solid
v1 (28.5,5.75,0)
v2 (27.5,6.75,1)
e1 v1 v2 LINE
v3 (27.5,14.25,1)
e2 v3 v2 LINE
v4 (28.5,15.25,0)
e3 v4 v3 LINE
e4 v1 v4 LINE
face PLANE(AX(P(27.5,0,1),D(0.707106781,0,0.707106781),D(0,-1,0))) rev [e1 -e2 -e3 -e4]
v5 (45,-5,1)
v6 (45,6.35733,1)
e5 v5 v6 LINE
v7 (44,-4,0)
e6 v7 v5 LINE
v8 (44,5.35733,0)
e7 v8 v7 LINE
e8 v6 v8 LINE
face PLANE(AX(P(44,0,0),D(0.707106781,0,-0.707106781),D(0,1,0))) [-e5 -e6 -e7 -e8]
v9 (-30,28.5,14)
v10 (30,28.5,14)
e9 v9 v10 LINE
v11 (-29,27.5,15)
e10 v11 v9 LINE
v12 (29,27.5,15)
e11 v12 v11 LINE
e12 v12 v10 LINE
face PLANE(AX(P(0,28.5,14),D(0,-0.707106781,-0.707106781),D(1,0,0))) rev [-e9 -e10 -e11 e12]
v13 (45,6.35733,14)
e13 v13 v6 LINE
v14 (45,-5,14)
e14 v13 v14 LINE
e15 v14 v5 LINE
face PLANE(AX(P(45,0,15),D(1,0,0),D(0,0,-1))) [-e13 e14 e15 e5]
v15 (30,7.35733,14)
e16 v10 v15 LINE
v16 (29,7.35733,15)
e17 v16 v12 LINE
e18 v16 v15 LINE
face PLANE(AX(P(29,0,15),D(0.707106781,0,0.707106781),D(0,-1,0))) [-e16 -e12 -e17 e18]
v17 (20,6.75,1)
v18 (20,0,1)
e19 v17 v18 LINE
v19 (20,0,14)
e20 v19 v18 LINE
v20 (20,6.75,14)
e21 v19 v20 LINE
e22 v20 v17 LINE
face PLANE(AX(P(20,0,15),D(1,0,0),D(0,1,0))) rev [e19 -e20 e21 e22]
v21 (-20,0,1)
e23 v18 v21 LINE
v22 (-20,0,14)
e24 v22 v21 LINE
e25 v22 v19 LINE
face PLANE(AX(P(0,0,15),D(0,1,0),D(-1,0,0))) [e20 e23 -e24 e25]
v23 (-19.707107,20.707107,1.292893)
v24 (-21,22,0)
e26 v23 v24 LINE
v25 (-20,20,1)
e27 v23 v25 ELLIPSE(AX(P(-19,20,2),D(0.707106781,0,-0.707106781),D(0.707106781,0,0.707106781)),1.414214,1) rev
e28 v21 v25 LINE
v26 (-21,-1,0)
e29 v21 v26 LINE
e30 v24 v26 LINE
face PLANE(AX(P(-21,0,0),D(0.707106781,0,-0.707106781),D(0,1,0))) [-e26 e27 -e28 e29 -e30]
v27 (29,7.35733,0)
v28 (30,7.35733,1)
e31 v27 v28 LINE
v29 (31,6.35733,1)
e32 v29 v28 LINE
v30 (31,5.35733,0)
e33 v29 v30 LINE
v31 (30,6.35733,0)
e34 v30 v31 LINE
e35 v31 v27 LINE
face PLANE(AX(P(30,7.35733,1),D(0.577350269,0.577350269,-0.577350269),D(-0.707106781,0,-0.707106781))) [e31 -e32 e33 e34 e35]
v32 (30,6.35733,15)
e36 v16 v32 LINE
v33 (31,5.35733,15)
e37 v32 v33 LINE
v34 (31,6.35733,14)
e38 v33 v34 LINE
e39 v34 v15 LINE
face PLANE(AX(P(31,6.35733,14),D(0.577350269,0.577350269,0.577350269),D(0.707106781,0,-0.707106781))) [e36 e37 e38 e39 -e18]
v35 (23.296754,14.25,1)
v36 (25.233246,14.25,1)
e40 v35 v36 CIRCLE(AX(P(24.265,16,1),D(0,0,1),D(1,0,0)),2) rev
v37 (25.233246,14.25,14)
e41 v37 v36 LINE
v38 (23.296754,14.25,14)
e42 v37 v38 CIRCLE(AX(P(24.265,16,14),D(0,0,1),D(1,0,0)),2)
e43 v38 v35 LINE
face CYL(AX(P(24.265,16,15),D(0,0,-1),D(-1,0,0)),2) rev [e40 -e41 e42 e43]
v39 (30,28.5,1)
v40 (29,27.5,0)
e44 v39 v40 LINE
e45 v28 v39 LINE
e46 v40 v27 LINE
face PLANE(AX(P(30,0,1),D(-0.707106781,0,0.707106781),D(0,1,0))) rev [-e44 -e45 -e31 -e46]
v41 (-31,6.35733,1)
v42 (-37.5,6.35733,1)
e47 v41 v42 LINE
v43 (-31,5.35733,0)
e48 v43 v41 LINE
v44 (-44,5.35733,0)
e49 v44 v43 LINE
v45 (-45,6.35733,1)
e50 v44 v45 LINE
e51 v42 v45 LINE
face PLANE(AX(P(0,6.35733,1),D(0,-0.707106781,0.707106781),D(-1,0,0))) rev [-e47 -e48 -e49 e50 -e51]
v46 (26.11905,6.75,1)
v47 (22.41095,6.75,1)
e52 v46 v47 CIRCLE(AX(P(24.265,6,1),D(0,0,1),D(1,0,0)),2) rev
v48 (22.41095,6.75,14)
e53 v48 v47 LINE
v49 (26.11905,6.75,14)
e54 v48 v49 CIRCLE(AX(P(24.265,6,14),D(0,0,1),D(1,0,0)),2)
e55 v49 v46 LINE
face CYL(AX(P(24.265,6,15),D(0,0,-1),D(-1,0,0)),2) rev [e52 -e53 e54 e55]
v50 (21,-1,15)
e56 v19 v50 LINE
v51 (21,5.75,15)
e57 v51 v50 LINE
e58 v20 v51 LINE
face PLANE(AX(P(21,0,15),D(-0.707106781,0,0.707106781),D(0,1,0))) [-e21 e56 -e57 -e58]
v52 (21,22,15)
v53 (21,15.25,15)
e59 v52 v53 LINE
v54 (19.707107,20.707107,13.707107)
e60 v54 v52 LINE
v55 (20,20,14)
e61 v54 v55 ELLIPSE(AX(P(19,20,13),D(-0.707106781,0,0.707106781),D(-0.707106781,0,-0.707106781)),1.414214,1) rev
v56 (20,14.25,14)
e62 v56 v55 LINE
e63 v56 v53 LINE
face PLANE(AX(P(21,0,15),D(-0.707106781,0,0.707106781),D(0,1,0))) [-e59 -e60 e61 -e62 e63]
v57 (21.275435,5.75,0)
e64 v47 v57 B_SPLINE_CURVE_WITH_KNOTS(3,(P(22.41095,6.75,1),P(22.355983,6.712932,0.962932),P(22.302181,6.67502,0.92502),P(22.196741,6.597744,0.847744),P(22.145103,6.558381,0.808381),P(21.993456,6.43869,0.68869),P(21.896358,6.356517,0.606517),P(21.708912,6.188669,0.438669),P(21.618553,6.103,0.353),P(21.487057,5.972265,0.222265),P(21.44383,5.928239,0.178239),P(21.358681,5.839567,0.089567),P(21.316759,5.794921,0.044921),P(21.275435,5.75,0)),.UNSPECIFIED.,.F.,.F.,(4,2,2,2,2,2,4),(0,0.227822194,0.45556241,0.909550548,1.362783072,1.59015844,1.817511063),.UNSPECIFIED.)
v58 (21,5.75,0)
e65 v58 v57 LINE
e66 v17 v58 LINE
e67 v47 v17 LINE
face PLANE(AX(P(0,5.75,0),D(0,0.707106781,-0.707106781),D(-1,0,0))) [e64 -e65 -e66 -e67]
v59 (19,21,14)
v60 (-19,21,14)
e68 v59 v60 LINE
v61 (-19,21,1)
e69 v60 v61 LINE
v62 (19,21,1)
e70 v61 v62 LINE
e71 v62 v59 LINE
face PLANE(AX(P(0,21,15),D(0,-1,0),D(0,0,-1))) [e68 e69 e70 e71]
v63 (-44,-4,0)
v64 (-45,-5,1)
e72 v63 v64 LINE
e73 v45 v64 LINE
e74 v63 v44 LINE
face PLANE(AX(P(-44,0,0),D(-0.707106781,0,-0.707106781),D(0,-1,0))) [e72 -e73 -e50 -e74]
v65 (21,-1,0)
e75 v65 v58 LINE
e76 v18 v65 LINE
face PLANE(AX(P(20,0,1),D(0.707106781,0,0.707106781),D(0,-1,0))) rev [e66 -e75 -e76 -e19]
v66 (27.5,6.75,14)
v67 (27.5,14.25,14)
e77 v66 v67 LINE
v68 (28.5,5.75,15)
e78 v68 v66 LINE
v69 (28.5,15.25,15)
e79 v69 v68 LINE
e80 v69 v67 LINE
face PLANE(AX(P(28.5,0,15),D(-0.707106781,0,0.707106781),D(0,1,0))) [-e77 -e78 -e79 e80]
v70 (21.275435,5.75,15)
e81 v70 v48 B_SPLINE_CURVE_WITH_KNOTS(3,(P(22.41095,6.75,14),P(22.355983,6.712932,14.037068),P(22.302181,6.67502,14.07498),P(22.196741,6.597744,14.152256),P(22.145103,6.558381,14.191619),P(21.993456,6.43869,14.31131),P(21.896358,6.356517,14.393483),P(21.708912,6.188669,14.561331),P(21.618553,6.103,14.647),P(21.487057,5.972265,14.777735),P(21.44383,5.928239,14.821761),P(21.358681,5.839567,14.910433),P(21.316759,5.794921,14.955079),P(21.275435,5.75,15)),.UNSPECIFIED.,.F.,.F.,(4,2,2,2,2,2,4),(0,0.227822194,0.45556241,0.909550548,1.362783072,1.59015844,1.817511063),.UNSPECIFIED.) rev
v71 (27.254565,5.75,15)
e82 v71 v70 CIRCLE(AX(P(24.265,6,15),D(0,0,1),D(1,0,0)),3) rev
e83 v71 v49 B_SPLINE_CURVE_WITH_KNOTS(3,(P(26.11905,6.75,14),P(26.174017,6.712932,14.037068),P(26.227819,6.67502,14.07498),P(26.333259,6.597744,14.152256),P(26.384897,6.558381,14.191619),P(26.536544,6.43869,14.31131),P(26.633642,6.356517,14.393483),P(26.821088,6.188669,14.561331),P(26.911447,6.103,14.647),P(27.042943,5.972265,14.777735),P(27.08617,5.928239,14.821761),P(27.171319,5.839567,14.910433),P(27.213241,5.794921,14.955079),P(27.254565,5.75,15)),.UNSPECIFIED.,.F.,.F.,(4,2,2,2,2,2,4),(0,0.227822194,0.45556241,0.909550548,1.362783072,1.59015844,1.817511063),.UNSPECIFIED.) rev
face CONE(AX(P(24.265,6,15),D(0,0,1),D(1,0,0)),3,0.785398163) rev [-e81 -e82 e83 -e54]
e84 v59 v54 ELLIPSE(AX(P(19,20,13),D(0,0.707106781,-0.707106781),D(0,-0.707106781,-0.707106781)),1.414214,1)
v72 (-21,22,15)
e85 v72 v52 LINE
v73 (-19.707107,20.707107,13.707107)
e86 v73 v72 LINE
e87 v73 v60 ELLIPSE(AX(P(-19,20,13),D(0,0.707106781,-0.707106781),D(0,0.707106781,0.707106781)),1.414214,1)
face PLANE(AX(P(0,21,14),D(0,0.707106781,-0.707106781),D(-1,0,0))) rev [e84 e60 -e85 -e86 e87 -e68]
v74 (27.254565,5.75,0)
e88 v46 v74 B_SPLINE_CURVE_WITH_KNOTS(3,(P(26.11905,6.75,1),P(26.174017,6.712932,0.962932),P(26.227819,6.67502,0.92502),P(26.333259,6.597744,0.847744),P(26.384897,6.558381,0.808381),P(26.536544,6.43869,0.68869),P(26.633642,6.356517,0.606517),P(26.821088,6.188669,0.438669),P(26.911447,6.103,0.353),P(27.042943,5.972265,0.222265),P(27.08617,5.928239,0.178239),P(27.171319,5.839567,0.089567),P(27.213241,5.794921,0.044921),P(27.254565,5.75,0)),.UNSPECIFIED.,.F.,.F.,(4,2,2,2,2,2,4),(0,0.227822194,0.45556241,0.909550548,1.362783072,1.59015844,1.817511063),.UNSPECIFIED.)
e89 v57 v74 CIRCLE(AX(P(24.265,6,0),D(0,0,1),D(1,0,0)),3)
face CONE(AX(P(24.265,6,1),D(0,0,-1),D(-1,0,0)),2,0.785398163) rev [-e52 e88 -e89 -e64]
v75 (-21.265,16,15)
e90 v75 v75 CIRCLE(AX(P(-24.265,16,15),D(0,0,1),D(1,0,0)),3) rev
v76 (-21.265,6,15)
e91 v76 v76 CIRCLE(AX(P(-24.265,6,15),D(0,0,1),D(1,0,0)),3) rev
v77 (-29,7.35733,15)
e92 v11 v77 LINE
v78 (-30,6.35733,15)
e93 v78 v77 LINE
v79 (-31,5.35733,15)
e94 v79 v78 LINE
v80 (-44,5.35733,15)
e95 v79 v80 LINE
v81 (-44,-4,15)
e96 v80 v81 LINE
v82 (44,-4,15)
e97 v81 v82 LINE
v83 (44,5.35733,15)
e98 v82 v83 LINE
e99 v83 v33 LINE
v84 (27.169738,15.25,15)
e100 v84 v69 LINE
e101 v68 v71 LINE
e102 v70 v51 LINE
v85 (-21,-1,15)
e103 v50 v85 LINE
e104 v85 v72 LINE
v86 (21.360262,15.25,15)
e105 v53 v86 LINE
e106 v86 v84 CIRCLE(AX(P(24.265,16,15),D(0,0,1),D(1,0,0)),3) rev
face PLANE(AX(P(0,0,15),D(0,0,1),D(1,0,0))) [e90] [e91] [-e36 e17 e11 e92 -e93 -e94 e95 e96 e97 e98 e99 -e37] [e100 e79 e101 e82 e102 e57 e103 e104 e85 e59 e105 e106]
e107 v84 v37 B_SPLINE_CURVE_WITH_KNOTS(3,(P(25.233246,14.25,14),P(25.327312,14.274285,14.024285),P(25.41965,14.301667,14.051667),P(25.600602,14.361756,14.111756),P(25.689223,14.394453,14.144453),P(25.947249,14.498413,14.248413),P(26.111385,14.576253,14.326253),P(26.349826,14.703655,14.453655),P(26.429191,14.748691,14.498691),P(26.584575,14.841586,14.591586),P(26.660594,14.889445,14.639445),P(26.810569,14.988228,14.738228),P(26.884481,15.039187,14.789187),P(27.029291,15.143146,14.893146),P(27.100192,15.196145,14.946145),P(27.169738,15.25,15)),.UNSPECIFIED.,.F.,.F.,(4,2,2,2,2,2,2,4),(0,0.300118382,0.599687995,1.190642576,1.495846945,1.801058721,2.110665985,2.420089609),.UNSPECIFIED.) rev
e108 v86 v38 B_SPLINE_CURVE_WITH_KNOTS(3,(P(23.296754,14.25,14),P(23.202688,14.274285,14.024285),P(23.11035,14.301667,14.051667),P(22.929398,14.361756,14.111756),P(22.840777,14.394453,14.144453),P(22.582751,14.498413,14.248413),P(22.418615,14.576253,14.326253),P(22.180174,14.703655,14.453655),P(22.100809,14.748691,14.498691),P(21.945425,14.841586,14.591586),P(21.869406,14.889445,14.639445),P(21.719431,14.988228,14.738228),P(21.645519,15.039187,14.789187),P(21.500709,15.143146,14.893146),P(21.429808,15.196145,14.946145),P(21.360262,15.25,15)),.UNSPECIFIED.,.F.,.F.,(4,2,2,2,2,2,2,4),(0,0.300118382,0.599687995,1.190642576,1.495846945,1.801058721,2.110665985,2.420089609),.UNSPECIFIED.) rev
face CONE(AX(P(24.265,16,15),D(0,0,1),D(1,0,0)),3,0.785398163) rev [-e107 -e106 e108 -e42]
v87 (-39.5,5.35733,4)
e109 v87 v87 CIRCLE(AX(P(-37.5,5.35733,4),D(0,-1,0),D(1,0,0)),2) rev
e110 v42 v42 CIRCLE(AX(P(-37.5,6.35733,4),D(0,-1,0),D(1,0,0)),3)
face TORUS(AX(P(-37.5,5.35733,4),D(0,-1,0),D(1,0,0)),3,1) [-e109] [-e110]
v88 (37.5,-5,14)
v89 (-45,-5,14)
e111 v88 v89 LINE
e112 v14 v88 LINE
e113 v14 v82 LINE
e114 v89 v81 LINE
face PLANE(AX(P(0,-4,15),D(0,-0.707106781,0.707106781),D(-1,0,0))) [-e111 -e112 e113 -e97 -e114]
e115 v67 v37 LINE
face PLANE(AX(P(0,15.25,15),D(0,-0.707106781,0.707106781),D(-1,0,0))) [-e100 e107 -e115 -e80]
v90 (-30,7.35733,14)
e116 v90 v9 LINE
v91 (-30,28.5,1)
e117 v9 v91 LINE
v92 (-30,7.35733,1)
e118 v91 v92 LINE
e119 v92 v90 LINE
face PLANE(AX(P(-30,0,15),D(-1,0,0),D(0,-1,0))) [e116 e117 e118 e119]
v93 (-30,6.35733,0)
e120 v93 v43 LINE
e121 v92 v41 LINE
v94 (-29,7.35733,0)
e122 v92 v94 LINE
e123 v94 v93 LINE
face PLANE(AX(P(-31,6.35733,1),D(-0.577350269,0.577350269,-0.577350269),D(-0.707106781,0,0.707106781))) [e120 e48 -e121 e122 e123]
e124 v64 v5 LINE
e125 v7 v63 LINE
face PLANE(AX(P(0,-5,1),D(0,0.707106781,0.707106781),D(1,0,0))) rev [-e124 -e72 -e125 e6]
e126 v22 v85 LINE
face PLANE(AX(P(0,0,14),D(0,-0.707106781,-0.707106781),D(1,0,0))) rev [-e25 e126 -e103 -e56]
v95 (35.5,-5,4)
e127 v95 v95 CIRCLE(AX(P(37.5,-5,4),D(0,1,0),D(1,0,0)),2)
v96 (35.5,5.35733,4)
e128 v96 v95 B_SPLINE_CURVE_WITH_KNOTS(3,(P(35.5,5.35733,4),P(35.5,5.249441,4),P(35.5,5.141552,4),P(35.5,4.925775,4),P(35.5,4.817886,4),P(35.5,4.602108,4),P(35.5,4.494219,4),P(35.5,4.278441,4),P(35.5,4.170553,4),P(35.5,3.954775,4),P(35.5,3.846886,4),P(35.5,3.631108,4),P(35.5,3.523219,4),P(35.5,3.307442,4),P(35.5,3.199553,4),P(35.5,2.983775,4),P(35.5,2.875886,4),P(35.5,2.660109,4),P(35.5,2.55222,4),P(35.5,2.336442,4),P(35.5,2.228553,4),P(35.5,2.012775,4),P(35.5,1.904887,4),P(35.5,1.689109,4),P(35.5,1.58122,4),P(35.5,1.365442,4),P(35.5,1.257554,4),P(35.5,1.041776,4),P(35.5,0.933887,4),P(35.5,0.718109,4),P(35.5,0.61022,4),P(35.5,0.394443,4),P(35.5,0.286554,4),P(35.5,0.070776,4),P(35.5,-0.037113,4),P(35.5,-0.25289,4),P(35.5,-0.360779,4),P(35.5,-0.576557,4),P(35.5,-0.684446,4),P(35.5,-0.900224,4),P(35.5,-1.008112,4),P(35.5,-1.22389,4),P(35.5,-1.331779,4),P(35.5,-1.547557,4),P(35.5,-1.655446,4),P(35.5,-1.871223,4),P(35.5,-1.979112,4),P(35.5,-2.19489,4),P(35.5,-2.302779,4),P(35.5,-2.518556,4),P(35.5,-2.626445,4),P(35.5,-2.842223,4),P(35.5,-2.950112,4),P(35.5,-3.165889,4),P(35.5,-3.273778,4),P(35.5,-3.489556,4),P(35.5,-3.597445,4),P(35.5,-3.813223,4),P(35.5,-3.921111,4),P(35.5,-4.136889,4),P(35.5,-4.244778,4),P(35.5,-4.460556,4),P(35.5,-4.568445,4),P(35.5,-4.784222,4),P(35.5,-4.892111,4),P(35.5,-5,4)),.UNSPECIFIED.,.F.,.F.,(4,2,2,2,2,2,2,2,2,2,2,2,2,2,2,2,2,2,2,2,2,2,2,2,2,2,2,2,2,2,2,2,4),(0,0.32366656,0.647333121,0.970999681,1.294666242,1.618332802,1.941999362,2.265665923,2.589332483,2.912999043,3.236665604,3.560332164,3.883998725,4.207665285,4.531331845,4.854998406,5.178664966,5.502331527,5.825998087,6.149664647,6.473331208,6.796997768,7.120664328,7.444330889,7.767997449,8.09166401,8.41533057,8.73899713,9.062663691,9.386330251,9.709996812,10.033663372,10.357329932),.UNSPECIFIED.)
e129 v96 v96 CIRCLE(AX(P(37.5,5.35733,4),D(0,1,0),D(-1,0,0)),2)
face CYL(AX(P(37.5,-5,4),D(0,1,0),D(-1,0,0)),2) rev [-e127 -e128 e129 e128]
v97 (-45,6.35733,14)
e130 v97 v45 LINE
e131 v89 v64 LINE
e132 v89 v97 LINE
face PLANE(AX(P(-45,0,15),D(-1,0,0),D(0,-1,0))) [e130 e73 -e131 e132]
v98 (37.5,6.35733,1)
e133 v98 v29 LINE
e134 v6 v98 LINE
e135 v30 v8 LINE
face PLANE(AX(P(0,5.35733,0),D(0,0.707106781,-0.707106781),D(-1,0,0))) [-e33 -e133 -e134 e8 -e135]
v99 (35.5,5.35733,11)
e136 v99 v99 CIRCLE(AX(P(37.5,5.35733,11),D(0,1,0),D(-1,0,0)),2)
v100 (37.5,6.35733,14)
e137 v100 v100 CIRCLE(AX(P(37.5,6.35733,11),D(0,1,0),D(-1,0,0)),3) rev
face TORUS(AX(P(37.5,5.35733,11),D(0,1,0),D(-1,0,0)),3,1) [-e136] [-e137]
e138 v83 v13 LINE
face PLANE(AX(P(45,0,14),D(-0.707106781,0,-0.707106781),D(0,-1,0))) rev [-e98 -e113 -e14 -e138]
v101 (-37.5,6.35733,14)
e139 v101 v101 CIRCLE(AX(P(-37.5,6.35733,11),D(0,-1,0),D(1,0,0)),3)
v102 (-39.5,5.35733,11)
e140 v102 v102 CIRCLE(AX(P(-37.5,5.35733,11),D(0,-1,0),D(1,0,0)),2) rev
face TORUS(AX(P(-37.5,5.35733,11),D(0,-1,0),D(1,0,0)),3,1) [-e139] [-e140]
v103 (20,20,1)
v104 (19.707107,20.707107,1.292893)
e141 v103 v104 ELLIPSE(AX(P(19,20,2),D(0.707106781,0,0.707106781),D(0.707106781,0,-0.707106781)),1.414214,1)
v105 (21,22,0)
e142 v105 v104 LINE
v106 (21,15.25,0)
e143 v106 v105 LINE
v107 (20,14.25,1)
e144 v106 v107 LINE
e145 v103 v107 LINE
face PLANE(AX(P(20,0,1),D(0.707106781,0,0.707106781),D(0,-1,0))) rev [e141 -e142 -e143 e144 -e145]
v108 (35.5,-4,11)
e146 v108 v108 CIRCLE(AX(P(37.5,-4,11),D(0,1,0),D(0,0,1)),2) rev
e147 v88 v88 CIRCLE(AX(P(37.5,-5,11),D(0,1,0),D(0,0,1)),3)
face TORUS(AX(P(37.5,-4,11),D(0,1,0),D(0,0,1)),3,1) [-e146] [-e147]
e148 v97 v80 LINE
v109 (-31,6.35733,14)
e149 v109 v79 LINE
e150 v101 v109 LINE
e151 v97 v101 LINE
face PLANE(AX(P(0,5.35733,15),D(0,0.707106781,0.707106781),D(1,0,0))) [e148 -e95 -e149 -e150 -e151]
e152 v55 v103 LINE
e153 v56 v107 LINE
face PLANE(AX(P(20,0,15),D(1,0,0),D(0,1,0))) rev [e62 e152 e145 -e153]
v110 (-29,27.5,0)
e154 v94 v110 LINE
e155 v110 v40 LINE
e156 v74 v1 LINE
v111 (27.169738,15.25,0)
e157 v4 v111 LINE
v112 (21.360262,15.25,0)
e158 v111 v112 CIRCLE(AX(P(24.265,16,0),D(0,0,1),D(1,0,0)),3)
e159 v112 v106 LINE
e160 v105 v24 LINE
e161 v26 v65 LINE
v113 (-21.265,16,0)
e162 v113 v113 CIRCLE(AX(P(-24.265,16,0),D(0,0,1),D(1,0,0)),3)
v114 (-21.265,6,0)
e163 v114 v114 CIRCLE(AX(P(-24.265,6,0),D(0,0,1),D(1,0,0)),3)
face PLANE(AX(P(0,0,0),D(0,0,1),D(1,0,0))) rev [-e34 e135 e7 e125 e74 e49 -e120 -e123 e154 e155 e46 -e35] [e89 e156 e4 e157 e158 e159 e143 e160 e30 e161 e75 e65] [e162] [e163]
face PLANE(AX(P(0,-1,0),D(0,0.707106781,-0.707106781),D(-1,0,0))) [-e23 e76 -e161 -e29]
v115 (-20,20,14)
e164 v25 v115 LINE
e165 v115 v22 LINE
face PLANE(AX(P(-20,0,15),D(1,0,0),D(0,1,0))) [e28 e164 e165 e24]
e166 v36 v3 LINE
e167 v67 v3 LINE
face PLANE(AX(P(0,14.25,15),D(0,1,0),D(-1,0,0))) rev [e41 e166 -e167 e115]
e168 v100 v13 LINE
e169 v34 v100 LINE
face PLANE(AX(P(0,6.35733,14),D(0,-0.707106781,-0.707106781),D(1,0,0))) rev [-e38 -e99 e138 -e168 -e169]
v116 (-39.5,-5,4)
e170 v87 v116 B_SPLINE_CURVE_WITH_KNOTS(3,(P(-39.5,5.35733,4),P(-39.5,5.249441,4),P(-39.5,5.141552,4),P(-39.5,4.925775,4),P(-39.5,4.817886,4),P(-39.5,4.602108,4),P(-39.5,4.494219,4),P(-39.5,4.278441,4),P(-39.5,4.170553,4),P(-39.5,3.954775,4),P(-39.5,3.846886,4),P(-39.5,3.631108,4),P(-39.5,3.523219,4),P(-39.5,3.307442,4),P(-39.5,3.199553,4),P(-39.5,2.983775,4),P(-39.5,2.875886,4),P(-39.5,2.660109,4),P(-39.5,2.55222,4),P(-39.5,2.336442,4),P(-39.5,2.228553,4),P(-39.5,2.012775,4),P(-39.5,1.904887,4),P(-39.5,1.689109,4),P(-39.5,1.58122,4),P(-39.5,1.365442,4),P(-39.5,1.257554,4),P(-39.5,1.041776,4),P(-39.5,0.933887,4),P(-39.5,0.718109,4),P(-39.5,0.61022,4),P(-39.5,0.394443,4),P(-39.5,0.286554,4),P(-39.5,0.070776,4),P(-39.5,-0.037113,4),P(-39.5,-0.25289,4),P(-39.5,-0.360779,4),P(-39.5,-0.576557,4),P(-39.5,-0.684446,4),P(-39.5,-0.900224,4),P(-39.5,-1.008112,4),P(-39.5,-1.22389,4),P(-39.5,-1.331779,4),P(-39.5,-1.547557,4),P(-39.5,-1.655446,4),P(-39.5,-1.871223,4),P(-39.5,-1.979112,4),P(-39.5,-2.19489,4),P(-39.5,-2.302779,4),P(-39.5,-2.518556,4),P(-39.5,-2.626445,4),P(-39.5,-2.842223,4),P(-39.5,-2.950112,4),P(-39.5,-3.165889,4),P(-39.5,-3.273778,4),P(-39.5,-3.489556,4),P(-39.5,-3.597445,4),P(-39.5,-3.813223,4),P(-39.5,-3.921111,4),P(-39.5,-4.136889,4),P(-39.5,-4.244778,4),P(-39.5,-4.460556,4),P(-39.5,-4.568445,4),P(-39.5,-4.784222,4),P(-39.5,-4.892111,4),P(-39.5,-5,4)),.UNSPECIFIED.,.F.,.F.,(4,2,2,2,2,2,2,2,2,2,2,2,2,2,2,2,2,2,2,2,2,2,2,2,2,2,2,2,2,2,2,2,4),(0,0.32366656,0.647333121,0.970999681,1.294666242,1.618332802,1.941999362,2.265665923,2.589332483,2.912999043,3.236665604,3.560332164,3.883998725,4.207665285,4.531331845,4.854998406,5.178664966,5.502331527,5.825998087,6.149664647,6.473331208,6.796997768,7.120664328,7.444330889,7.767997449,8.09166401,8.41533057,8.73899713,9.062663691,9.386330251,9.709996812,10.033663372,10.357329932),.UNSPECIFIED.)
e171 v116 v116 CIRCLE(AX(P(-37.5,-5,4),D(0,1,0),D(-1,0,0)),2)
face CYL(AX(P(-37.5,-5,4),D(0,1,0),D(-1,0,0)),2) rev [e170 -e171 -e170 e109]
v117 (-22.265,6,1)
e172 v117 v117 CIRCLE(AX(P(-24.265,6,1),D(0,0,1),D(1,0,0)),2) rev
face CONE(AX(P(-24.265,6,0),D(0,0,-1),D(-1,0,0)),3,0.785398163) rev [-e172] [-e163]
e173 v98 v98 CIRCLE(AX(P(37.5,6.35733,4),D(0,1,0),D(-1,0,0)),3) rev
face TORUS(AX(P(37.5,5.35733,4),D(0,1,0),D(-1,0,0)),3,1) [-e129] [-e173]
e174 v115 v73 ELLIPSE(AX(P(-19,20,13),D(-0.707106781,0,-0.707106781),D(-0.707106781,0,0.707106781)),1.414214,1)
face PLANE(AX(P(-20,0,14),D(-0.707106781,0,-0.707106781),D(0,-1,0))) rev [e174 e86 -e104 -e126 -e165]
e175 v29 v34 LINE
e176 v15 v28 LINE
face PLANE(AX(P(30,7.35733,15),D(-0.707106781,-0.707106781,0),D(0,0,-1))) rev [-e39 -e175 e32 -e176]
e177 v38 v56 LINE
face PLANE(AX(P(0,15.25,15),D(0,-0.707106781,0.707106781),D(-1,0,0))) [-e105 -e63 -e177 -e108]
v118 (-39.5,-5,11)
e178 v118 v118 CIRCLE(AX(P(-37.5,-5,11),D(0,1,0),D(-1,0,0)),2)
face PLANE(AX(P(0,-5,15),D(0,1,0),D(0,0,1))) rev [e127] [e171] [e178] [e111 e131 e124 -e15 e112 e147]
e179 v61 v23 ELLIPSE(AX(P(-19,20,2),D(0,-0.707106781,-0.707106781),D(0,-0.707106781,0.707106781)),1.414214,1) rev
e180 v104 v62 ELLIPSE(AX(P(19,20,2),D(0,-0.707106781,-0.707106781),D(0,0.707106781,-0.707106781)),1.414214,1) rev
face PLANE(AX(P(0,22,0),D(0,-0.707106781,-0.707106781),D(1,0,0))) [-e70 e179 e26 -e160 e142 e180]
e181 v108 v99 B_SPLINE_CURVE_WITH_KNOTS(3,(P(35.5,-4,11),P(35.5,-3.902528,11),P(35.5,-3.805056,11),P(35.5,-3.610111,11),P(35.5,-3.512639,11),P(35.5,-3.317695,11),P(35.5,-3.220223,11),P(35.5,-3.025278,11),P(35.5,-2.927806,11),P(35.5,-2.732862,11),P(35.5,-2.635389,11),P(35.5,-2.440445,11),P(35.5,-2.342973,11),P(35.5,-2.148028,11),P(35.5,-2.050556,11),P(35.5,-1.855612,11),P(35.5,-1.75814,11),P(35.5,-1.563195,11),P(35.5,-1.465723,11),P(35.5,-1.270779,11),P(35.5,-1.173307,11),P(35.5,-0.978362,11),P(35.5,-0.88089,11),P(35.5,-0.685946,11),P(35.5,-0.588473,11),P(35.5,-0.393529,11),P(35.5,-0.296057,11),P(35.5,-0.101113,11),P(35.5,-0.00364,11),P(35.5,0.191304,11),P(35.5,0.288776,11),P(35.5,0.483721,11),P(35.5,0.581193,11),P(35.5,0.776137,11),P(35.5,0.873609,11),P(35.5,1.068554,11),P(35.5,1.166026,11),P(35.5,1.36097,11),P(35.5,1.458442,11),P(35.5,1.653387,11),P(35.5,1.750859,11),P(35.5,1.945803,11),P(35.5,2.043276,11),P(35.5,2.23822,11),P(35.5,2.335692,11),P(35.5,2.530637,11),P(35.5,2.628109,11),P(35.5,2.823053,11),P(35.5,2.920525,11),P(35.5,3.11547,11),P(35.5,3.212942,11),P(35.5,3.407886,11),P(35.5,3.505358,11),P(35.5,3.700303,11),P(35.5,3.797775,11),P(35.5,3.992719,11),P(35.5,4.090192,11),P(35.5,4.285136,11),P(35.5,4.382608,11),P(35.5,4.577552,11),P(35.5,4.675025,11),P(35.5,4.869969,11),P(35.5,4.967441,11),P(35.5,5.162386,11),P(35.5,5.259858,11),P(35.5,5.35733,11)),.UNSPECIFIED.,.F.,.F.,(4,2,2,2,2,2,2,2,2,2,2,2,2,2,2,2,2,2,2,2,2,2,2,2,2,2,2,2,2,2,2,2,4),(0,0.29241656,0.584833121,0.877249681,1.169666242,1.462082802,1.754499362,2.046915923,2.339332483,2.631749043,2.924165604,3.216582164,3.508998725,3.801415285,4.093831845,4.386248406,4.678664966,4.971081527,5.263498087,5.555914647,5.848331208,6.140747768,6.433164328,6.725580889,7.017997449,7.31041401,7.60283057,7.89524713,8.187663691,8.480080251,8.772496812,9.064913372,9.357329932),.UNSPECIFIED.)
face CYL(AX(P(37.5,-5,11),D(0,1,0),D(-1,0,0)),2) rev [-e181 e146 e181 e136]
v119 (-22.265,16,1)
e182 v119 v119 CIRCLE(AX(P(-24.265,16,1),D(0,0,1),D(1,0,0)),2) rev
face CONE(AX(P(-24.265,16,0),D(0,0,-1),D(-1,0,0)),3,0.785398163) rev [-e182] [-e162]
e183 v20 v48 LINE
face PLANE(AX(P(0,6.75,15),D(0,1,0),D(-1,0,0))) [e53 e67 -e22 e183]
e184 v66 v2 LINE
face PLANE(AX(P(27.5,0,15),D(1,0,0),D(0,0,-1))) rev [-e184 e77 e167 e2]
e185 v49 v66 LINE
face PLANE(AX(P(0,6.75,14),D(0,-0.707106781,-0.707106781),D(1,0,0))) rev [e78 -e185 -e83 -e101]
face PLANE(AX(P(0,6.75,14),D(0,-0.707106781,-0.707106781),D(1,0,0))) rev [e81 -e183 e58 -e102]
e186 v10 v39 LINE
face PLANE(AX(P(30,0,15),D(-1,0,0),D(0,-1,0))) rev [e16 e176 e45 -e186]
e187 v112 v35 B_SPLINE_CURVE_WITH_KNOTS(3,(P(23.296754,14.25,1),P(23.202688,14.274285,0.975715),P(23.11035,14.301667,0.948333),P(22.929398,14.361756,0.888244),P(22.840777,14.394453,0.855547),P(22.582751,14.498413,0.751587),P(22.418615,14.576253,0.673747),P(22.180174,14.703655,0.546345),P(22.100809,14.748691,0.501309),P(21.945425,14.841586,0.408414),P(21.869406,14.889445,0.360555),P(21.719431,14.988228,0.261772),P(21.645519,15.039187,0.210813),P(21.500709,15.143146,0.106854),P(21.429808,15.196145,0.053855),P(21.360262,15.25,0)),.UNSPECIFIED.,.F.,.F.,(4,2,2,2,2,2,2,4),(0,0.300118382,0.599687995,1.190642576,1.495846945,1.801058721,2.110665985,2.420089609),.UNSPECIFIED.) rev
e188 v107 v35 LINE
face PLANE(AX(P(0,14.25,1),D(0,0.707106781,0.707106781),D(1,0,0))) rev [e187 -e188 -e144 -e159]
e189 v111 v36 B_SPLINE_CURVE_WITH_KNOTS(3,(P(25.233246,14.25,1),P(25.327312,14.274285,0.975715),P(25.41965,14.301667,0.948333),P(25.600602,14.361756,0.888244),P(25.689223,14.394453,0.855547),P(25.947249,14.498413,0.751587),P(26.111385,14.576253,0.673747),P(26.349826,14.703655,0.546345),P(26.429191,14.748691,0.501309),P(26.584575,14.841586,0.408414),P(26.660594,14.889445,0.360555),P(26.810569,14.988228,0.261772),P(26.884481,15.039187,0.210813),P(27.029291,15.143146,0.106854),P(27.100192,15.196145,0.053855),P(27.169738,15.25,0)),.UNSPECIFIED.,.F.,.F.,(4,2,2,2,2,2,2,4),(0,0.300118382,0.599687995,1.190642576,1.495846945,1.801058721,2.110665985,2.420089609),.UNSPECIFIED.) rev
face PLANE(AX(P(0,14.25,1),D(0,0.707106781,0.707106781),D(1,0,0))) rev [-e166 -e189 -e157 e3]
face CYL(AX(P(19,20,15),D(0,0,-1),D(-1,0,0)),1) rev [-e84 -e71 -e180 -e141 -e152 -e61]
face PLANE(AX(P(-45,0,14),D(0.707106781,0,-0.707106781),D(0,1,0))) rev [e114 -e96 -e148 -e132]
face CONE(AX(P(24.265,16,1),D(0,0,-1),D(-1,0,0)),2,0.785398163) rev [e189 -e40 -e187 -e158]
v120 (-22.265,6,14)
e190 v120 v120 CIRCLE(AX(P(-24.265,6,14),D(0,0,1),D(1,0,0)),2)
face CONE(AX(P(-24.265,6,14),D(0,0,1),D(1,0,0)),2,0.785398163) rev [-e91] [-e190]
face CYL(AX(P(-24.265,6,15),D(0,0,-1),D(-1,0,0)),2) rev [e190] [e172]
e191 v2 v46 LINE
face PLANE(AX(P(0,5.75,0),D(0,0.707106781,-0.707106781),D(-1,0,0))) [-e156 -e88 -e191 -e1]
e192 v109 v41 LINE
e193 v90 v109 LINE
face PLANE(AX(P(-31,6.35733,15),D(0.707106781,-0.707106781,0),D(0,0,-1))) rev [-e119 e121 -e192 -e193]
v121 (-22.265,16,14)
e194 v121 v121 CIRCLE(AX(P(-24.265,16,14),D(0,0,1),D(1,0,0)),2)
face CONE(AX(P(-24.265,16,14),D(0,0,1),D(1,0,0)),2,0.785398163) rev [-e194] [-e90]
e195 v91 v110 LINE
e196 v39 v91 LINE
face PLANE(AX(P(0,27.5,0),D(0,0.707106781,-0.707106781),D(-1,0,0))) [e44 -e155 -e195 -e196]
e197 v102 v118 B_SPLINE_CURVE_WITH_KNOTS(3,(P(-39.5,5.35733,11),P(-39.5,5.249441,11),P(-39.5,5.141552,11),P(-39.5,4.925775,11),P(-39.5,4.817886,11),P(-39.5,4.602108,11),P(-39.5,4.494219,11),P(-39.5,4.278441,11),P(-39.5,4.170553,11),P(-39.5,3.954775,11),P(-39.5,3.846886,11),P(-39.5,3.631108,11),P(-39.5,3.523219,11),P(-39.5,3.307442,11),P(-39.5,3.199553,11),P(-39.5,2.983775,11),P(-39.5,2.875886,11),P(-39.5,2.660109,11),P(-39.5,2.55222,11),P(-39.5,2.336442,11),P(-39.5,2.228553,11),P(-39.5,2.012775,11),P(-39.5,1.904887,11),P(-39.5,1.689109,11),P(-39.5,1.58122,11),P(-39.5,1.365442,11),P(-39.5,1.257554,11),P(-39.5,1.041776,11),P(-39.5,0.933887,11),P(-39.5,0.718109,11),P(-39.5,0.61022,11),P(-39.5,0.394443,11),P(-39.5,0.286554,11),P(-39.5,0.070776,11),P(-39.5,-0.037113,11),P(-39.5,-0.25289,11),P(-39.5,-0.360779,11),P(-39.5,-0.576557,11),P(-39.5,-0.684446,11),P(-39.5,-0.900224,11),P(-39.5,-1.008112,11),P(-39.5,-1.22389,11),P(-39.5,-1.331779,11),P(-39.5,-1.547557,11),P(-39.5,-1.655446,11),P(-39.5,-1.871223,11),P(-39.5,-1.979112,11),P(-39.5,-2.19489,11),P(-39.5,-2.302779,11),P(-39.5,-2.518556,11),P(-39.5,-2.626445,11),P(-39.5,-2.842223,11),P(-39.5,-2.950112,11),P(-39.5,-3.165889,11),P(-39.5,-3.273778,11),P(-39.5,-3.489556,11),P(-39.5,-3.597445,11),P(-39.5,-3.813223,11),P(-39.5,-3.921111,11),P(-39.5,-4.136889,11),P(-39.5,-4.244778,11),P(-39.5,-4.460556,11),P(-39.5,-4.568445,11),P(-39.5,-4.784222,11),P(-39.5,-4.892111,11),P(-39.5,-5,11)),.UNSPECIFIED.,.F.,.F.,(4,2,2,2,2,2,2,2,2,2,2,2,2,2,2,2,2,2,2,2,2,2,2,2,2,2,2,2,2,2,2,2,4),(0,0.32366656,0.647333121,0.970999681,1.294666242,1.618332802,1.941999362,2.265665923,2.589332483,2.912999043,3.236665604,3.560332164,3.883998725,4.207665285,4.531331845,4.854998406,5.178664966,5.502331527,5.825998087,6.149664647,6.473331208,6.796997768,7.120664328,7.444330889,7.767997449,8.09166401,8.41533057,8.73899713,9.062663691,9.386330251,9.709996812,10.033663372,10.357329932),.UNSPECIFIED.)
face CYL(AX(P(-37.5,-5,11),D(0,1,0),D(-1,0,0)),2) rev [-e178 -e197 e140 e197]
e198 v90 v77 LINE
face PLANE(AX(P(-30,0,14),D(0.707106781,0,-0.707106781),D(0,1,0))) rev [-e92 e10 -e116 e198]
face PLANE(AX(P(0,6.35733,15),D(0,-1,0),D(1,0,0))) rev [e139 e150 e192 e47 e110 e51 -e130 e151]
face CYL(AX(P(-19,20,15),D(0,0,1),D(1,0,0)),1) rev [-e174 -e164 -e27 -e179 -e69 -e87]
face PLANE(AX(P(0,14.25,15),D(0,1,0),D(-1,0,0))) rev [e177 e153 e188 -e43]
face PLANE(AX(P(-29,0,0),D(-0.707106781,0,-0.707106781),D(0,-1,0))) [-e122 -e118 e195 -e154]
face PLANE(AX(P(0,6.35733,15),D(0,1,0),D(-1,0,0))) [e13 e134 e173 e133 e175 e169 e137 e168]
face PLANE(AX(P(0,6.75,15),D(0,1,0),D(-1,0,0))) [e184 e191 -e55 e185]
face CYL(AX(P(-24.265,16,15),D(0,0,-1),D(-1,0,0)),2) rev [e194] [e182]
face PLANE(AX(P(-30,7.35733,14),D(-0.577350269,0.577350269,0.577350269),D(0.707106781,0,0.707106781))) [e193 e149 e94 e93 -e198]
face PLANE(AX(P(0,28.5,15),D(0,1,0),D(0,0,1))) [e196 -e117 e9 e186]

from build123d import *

# Parameters (mm, degrees)
SKETCH1_R               = 2
BOSS_EXTRUDE1_DEPTH     = 15
CUT_EXTRUDE1_DEPTH      = 53.347854185
CUT_EXTRUDE1_DEPTH_BACK = 53.347854185
SKETCH2_R               = 2
CHAMFER1_SIZE           = 1
FILLET1_R               = 1


with BuildPart() as part:
    # Sketch1 → Boss-Extrude1 (new body)
    with BuildSketch(Plane.XY):
        Polygon((30, 6.357329932), (30, 28.5), (-30, 28.5), (-30, 6.357329932), (-45, 6.357329932), (-45, -5), (45, -5), (45, 6.357329932), align=None)
        with BuildLine():
            Line((-20, 0), (-20, 21))
            Line((-20, 21), (20, 21))
            Line((20, 21), (20, 14.25))
            Line((20, 14.25), (23.296754163, 14.25))
            ThreePointArc((23.296754163, 14.25), (24.265, 18), (25.233245837, 14.25))
            Line((25.233245837, 14.25), (27.5, 14.25))
            Line((27.5, 14.25), (27.5, 6.75))
            Line((27.5, 6.75), (26.119049622, 6.75))
            ThreePointArc((26.119049622, 6.75), (24.265, 4), (22.410950378, 6.75))
            Line((22.410950378, 6.75), (20, 6.75))
            Line((20, 6.75), (20, 0))
            Line((20, 0), (-20, 0))
        make_face(mode=Mode.SUBTRACT)
        with Locations((-24.265, 16)):
            Circle(SKETCH1_R, mode=Mode.SUBTRACT)
        with Locations((-24.265, 6)):
            Circle(SKETCH1_R, mode=Mode.SUBTRACT)
    extrude(amount=BOSS_EXTRUDE1_DEPTH)

    # Sketch2 → Cut-Extrude1 (cut, two sides: drawn at the far end of the back side and taken through both)
    with BuildSketch(Plane(origin=(0, 6.357329932, 0), x_dir=(1, 0, 0), z_dir=(0, 1, 0)).offset(-CUT_EXTRUDE1_DEPTH_BACK)):
        with Locations(Location((-37.5, -4, 0), (0, 0, 180))):
            Circle(SKETCH2_R)
        with Locations(Location((-37.5, -11, 0), (0, 0, 180))):
            Circle(SKETCH2_R)
        with Locations(Location((37.5, -11, 0), (0, 0, 180))):
            Circle(SKETCH2_R)
        with Locations(Location((37.5, -4, 0), (0, 0, 180))):
            Circle(SKETCH2_R)
    extrude(amount=CUT_EXTRUDE1_DEPTH + CUT_EXTRUDE1_DEPTH_BACK, mode=Mode.SUBTRACT)

    # Chamfer1
    chamfer1_edges = [part.edges().sort_by_distance(p)[0] for p in [
        (24.265, 4, 15),
        (21.205475189, 6.75, 15),
        (-26.265, 6, 15),
        (-26.265, 16, 15),
        (37.5, 6.357329932, 15),
        (30, 17.428664966, 15),
        (-26.265, 16, 0),
        (-26.265, 6, 0),
        (21.205475189, 6.75, 0),
        (0, 28.5, 15),
        (24.265, 4, 0),
        (26.809524811, 6.75, 0),
        (27.5, 10.5, 0),
        (26.366622918, 14.25, 0),
        (24.265, 18, 0),
        (21.648377082, 14.25, 0),
        (20, 17.625, 0),
        (0, 21, 0),
        (-20, 10.5, 0),
        (0, 0, 0),
        (-30, 17.428664966, 15),
        (20, 3.375, 0),
        (0, -5, 0),
        (-45, 0.678664966, 0),
        (-37.5, 6.357329932, 0),
        (-30, 17.428664966, 0),
        (0, 28.5, 0),
        (30, 17.428664966, 0),
        (37.5, 6.357329932, 0),
        (45, 0.678664966, 0),
        (-37.5, 6.357329932, 15),
        (-45, 0.678664966, 15),
        (-30, 6.357329932, 7.5),
        (30, 6.357329932, 7.5),
        (0, -5, 15),
        (20, 3.375, 15),
        (0, 0, 15),
        (-20, 10.5, 15),
        (0, 21, 15),
        (20, 17.625, 15),
        (45, 0.678664966, 15),
        (21.648377082, 14.25, 15),
        (24.265, 18, 15),
        (26.366622918, 14.25, 15),
        (27.5, 10.5, 15),
        (26.809524811, 6.75, 15),
    ]]
    chamfer(chamfer1_edges, length=CHAMFER1_SIZE)

    # Fillet1
    fillet1_edges = [part.edges().sort_by_distance(p)[0] for p in [
        (39.5, 6.357329932, 4),
        (39.5, 6.357329932, 11),
        (39.5, -5, 11),
        (-35.5, 6.357329932, 11),
        (-35.5, 6.357329932, 4),
        (20, 21, 7.5),
        (-20, 21, 7.5),
    ]]
    fillet(fillet1_edges, radius=FILLET1_R - 0.0001)  # a hair under: the kernel refuses the full size


solid = part.part
